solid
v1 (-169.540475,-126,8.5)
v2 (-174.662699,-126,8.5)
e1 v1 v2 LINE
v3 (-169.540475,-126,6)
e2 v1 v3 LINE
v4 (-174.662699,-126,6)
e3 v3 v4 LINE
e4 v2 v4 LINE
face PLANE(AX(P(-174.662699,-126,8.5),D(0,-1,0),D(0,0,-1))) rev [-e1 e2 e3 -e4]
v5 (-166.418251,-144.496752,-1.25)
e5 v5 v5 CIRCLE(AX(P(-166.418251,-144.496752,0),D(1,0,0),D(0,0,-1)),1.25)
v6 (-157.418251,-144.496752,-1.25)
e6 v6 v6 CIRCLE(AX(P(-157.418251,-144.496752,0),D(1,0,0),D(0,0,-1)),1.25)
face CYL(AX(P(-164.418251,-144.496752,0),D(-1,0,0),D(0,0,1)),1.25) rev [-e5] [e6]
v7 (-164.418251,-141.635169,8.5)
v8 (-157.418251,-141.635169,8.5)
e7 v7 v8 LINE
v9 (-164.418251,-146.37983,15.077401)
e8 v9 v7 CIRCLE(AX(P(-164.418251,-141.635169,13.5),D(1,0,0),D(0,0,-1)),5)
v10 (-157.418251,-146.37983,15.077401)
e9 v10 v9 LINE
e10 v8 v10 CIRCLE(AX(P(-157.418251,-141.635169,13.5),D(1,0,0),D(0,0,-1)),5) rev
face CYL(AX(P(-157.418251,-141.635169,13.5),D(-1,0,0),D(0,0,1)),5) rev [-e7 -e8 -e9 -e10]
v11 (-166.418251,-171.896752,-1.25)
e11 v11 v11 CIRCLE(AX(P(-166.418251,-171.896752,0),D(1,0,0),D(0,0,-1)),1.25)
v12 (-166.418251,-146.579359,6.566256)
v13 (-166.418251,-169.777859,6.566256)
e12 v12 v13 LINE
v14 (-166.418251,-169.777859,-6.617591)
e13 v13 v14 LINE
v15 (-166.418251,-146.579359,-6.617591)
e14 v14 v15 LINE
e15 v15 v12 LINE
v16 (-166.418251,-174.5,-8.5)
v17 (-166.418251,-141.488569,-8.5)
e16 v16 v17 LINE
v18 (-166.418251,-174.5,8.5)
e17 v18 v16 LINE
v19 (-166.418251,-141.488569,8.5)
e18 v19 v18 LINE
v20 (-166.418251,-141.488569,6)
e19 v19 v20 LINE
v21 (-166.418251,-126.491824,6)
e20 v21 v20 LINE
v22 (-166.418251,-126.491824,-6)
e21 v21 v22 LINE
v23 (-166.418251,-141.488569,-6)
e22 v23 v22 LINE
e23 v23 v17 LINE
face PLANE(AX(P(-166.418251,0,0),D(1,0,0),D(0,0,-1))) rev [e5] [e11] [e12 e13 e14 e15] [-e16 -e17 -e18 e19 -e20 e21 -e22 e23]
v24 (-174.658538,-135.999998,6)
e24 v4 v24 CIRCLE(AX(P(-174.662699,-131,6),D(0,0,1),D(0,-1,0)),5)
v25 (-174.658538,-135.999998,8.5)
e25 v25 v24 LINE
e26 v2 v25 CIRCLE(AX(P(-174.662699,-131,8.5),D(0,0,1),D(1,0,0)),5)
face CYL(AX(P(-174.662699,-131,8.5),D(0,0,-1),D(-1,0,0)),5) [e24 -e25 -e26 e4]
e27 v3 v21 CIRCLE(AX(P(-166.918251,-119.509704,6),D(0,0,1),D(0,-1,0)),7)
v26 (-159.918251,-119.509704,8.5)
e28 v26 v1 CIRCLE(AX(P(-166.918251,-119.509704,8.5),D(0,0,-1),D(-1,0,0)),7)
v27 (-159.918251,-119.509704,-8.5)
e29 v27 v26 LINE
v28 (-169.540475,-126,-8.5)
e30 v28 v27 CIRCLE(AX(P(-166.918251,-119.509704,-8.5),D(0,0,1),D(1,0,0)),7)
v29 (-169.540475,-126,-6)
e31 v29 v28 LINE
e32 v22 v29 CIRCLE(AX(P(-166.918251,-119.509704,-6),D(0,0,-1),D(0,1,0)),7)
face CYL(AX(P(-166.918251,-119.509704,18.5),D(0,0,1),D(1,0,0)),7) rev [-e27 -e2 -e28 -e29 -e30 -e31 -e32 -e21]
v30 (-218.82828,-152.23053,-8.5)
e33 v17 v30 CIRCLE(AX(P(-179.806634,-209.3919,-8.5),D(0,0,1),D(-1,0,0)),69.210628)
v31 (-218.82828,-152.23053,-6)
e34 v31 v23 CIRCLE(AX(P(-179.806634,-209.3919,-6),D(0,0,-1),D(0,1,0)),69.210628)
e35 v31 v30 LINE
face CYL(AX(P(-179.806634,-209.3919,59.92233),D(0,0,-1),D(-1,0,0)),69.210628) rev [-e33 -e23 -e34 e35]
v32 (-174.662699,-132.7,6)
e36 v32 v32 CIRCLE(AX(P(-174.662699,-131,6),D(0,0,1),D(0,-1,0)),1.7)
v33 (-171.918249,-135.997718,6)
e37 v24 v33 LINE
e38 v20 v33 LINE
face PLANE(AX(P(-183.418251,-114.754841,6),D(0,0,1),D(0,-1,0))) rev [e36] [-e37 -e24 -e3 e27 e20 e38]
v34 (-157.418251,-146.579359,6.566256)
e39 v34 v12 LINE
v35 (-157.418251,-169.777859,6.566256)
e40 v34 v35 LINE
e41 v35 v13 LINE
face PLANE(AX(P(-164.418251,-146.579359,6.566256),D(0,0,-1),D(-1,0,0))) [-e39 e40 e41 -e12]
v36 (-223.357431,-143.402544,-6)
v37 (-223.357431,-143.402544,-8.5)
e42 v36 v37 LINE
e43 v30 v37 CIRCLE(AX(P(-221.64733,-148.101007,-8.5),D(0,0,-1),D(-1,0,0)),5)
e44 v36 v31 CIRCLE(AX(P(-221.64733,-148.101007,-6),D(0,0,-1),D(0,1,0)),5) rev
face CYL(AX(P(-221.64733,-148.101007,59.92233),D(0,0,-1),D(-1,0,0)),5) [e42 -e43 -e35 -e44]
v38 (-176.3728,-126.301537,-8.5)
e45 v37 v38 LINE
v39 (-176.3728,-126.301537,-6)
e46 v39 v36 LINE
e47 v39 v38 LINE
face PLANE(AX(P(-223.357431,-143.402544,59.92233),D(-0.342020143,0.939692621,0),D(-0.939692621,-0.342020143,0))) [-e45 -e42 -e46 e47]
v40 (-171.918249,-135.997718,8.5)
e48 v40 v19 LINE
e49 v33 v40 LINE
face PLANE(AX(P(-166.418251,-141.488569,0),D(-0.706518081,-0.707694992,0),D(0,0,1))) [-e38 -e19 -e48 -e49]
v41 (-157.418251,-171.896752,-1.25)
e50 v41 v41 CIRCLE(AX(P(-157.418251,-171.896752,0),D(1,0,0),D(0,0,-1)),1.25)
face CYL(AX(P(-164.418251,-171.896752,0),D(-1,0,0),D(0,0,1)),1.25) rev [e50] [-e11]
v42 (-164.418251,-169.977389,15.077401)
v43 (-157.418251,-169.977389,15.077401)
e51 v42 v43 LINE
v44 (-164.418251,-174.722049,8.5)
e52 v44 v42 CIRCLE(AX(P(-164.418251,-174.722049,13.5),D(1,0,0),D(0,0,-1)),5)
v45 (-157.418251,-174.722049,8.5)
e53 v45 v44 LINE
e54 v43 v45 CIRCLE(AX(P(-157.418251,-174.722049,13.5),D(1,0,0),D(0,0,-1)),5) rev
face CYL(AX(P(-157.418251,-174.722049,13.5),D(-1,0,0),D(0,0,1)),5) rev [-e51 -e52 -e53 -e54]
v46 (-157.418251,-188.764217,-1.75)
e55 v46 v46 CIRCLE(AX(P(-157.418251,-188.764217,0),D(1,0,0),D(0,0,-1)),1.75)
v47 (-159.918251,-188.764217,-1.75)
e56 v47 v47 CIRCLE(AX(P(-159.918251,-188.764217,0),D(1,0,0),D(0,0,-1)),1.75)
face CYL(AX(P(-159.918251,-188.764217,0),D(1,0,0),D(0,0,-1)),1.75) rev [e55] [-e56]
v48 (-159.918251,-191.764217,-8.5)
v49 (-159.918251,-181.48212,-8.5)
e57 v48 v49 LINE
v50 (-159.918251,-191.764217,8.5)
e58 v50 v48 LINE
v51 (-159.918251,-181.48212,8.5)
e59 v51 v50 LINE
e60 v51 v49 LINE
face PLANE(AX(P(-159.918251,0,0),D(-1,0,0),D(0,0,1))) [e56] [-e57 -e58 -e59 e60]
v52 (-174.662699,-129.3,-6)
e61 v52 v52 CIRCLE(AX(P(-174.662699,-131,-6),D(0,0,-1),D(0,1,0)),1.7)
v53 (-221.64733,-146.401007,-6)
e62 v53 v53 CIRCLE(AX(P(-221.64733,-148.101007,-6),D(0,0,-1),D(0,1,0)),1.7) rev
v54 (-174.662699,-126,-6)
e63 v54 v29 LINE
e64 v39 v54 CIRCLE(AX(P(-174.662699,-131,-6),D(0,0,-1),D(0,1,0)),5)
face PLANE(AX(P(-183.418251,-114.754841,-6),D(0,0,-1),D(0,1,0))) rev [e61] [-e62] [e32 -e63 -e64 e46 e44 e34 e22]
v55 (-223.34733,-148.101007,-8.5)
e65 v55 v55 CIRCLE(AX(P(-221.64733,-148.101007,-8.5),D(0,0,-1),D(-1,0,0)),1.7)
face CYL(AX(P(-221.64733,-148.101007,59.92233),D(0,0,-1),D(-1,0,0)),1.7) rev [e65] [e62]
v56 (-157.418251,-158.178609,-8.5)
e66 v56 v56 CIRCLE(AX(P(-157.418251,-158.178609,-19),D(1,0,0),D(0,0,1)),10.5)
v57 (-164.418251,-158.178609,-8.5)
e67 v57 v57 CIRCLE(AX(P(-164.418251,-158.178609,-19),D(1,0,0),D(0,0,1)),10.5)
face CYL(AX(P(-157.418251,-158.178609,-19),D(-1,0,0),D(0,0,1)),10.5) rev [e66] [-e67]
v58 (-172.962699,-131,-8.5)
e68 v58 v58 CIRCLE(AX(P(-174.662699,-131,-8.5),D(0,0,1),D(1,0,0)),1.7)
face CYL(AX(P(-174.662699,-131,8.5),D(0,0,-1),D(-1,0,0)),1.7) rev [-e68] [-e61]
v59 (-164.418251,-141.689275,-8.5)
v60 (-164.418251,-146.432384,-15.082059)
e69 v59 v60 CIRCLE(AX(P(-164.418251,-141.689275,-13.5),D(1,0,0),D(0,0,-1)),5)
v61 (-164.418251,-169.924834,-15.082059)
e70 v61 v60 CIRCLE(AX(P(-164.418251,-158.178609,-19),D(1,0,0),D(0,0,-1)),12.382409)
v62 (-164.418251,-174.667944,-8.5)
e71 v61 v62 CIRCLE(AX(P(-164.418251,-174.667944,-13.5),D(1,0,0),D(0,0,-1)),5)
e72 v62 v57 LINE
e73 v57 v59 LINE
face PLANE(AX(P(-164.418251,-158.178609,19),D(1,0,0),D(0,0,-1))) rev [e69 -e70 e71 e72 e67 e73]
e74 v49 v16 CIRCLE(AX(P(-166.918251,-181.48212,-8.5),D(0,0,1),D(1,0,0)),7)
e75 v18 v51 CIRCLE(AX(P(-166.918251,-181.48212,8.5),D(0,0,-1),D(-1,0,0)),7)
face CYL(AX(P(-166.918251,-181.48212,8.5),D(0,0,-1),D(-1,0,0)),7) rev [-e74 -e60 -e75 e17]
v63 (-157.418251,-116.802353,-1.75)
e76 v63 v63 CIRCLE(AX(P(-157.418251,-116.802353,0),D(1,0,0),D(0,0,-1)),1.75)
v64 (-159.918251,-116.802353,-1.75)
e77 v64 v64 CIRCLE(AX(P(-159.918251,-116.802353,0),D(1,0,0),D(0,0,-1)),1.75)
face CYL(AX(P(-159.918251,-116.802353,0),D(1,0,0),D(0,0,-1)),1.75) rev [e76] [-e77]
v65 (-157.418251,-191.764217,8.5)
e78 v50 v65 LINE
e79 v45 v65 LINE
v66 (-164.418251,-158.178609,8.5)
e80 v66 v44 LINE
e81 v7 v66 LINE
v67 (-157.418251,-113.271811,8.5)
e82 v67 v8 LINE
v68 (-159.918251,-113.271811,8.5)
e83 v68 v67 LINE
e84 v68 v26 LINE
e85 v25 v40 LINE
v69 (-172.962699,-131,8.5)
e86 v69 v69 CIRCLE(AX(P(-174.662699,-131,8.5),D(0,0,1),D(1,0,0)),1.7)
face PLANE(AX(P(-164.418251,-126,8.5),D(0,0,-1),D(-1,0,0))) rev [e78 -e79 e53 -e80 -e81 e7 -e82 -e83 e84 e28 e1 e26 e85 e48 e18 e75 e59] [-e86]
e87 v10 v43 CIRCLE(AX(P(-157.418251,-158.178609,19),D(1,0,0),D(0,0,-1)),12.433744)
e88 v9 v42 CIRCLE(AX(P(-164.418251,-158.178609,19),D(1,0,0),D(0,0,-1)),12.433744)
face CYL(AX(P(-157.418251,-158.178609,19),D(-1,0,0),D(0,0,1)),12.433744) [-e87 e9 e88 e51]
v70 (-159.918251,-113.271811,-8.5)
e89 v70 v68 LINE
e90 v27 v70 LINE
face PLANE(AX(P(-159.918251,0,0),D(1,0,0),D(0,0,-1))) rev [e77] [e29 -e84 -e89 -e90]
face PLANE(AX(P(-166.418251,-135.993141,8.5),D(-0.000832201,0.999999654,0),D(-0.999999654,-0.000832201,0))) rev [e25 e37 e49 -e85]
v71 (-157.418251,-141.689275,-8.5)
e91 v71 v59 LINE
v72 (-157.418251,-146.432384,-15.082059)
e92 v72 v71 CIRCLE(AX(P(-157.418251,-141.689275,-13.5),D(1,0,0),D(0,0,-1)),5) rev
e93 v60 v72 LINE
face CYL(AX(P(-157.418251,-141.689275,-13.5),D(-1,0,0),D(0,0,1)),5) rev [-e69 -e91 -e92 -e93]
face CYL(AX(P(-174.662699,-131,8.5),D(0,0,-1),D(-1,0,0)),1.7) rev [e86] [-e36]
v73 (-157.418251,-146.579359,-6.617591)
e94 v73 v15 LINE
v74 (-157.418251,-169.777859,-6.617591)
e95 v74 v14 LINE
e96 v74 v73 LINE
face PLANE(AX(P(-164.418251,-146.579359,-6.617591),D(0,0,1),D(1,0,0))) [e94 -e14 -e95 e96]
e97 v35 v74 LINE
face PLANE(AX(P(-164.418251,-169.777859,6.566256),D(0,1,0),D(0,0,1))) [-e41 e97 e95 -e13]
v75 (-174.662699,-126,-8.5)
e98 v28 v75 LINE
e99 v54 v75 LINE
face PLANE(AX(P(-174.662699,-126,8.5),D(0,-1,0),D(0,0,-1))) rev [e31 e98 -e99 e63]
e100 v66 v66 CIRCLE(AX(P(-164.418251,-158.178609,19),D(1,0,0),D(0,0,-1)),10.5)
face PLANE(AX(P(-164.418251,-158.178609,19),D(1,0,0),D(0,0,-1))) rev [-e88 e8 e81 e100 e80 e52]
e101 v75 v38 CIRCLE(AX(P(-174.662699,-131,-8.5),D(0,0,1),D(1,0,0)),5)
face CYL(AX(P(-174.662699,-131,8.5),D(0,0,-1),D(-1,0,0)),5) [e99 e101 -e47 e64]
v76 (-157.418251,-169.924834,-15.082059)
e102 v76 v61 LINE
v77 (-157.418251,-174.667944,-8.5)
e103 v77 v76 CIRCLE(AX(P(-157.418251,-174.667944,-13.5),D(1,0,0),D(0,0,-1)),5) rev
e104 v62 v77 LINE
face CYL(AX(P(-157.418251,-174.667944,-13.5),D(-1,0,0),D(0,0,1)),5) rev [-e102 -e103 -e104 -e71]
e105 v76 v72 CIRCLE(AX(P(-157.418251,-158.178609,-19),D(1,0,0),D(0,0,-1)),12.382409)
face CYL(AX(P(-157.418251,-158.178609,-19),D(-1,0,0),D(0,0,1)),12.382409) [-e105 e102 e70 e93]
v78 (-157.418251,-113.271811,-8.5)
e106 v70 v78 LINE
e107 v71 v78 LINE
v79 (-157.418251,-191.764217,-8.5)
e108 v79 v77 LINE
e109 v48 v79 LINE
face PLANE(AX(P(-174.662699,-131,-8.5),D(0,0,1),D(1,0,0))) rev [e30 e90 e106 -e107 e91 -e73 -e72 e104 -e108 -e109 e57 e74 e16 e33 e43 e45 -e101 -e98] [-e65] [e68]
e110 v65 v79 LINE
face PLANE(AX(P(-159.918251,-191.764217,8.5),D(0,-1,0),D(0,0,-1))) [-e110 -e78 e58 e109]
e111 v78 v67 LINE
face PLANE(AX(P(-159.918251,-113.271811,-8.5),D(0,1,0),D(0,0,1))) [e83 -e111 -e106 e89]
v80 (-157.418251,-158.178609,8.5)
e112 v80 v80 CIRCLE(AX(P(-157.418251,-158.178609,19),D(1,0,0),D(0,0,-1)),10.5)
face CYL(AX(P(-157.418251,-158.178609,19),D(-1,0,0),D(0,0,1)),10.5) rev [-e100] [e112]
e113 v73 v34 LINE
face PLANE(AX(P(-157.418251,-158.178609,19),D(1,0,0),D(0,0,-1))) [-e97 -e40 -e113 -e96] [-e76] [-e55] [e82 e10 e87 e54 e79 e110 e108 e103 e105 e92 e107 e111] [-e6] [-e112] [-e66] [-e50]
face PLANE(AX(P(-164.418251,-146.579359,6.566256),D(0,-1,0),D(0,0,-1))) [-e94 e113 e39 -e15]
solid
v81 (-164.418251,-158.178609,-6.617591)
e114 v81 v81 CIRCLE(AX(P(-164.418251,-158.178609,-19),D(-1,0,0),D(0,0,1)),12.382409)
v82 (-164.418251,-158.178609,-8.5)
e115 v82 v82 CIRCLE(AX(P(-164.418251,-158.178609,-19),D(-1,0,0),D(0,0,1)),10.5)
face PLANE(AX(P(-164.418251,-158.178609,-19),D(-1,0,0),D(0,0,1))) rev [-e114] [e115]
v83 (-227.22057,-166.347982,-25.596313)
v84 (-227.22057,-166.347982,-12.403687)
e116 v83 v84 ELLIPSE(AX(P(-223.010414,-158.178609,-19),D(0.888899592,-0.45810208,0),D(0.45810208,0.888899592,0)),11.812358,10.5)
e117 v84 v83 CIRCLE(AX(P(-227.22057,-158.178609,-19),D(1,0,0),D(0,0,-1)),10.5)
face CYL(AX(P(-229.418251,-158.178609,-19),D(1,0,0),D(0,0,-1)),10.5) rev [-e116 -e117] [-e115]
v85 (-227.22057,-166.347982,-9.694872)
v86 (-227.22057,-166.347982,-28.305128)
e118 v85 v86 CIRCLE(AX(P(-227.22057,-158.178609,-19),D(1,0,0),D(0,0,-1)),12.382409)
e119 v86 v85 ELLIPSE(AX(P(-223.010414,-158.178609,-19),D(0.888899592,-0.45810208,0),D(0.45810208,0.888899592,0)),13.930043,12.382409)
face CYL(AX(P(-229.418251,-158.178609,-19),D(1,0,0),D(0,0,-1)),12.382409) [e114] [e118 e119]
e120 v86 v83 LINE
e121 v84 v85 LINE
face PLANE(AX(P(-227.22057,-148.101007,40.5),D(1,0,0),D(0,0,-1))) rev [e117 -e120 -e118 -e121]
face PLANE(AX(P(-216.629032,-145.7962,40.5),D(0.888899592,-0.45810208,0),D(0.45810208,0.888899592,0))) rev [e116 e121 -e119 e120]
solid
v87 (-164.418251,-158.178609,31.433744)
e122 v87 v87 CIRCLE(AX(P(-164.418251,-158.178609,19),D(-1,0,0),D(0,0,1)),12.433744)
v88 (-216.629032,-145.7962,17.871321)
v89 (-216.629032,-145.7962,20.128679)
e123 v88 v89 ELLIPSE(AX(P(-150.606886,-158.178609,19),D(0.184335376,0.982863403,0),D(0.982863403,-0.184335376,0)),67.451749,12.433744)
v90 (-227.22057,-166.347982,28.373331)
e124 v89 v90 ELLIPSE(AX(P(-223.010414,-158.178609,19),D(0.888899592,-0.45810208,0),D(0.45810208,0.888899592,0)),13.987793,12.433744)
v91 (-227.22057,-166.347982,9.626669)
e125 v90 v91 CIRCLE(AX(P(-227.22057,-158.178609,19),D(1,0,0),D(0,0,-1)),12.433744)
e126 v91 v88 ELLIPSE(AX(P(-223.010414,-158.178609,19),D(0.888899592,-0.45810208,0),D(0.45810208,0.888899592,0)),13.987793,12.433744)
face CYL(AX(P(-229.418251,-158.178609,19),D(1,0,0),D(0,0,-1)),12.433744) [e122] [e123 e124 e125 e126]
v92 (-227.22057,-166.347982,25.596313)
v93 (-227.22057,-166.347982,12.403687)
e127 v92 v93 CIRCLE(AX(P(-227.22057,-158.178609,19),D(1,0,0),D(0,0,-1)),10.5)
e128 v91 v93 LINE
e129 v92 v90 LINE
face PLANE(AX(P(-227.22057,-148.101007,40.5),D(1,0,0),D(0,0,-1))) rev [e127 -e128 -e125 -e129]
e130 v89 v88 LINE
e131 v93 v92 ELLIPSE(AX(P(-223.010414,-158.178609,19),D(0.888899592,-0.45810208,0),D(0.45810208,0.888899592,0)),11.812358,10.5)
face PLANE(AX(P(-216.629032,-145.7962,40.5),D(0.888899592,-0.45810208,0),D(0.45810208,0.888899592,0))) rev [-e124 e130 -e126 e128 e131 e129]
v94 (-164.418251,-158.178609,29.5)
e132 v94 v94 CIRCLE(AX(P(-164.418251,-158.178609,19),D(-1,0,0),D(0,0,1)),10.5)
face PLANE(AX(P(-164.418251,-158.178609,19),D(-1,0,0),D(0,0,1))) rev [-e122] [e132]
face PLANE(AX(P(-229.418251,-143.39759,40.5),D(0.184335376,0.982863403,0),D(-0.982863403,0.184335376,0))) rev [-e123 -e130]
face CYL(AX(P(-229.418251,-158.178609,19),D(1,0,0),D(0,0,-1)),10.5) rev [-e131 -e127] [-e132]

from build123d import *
from OCP.BRepFilletAPI import BRepFilletAPI_MakeChamfer

# Parameters (mm, degrees)
SKETCH_1_R          = 1.7
EXTRUDE_1_DEPTH     = 8.5
SKETCH_2_W          = 12
SKETCH_2_H          = 22.490317402
CUT_EXTRUDE_1_DEPTH = 17
SKETCH_3_W          = 17
SKETCH_3_H          = 48.5
SKETCH_3_R          = 1.25
SKETCH_3_W_2        = 13.183847054
SKETCH_3_H_2        = 23.198500104
EXTRUDE_2_DEPTH     = 2
CUT_EXTRUDE_2_DEPTH = 27
CHAMFER_1_SIZE      = 5.5
CHAMFER_1_SIZE2     = 5.4954286
SKETCH_5_R          = 10.5
SKETCH_5_R_2        = 1.25
SKETCH_5_W          = 13.183847054
SKETCH_5_H          = 23.198500104
EXTRUDE_3_DEPTH     = 7
SKETCH_6_R          = 12.433743537
SKETCH_6_R_2        = 10.5
EXTRUDE_4_DEPTH     = 65
SKETCH_6_R_3        = 12.382409409
EXTRUDE_4_2_DEPTH   = 65
CUT_EXTRUDE_3_DEPTH = 50
SKETCH_8_W          = 17
SKETCH_8_H          = 17.264216674
SKETCH_8_R          = 1.75
SKETCH_8_H_2        = 24.850413137
EXTRUDE_5_DEPTH     = 2.5
FILLET_START        = -8.5
FILLET_1_DEPTH      = 17
FILLET_1_2_DEPTH    = 2.5
FILLET_START_2      = 6
FILLET_1_3_DEPTH    = 2.5
FILLET_2_R          = 5
SKETCH_9_R          = 1.7
EXTRUDE_6_DEPTH     = 2.5
CUT_EXTRUDE_6_DEPTH = 49
SKETCH_13_W         = 3.687301031
SKETCH_13_H         = 25.158467393
CUT_EXTRUDE_7_DEPTH = 49


with BuildPart() as part:
    # 草图1 → 凸台-拉伸1 (new, symmetric)
    with BuildSketch(Plane.XY):
        with BuildLine():
            Line((-174.662698808, -126), (-166.418250776, -126))
            Line((-166.418250776, -126), (-166.418250776, -135.993140688))
            Line((-166.418250776, -135.993140688), (-174.658537801, -135.999998269))
            ThreePointArc((-174.658537801, -135.999998269), (-179.662698375, -131.002080504), (-174.662698808, -126))
        make_face()
        with Locations((-174.662698808, -131)):
            Circle(SKETCH_1_R, mode=Mode.SUBTRACT)
    extrude(amount=EXTRUDE_1_DEPTH, both=True)

    # 草图2 → 切除-拉伸1 (cut)
    with BuildSketch(Plane(origin=(-166.418250776, 0, 0), x_dir=(0, 0, -1), z_dir=(1, 0, 0))):
        with Locations((0, -126)):
            Rectangle(SKETCH_2_W, SKETCH_2_H)
    extrude(amount=-CUT_EXTRUDE_1_DEPTH, mode=Mode.SUBTRACT)


with BuildPart() as cut_extrude_1_piece_1:
    # of the separate pieces the step leaves, piece 1, a body of its own (cut_extrude_1_pieces)
    add(part.part.solids().sort_by_distance((-174.662698808, -126, 6))[0])



with BuildPart() as cut_extrude_1_piece_2:
    # of the separate pieces the step leaves, piece 2, a body of its own (cut_extrude_1_pieces)
    add(part.part.solids().sort_by_distance((-174.662698808, -126, -8.5))[0])


with BuildPart() as cut_extrude_1_piece_1_1:
    add(cut_extrude_1_piece_1.part)

    add(cut_extrude_1_piece_2.part)  # 凸台-拉伸2 merges 切除-拉伸1 piece 2
    # 草图3 → 凸台-拉伸2 (add)
    with BuildSketch(Plane(origin=(-166.418250776, 0, 0), x_dir=(0, 0, -1), z_dir=(1, 0, 0))):
        with Locations((0, -150.25)):
            Rectangle(SKETCH_3_W, SKETCH_3_H)
        with Locations((0, -144.496752449)):
            Circle(SKETCH_3_R, mode=Mode.SUBTRACT)
        with Locations((0, -171.896752449)):
            Circle(SKETCH_3_R, mode=Mode.SUBTRACT)
        with Locations((0.025667064, -158.178609239)):
            Rectangle(SKETCH_3_W_2, SKETCH_3_H_2, mode=Mode.SUBTRACT)
    extrude(amount=EXTRUDE_2_DEPTH)

    # 草图4 → 切除-拉伸2 (cut)
    with BuildSketch(Plane(origin=(0, 0, -8.5), x_dir=(-1, 0, 0), z_dir=(0, 0, -1))):
        Polygon((169.540474792, -126), (164.418250776, -131.122224016), (164.418250776, -126), align=None)
    extrude(amount=-CUT_EXTRUDE_2_DEPTH, mode=Mode.SUBTRACT)

    # 倒角1: one chamfer whose edges measure the first distance from different faces: ONE call of the kernel's chamfer builder (chamfer() names one face for all edges)
    chamfer_1_edges_1 = [cut_extrude_1_piece_1_1.edges().sort_by_distance(p)[0] for p in [
        (-166.418250776, -135.993140688, -7.25),
    ]]
    chamfer_1_side_1 = [cut_extrude_1_piece_1_1.faces().sort_by_distance(p)[0] for p in [
        (-170.538394288, -135.996569478, -7.25),
    ]]
    chamfer_1_edges_2 = [cut_extrude_1_piece_1_1.edges().sort_by_distance(p)[0] for p in [
        (-166.418250776, -135.993140688, 7.25),
    ]]
    chamfer_1_side_2 = [cut_extrude_1_piece_1_1.faces().sort_by_distance(p)[0] for p in [
        (-170.538394288, -135.996569478, 7.25),
    ]]
    chamfer_1 = BRepFilletAPI_MakeChamfer(cut_extrude_1_piece_1_1.part.solid().wrapped)
    for e in chamfer_1_edges_1:
        chamfer_1.Add(CHAMFER_1_SIZE, CHAMFER_1_SIZE2, e.wrapped, chamfer_1_side_1[0].wrapped)  # the first distance lies on this face
    for e in chamfer_1_edges_2:
        chamfer_1.Add(CHAMFER_1_SIZE, CHAMFER_1_SIZE2, e.wrapped, chamfer_1_side_2[0].wrapped)  # the first distance lies on this face
    add(Compound.cast(chamfer_1.Shape()), mode=Mode.REPLACE)

    # 草图5 → 凸台-拉伸3 (add)
    with BuildSketch(Plane(origin=(-164.418250776, 0, 0), x_dir=(0, 0, -1), z_dir=(1, 0, 0))):
        with BuildLine():
            Line((-8.5, -164.838037019), (-8.5, -174.5))
            Line((-8.5, -174.5), (8.5, -174.5))
            Line((8.5, -174.5), (8.5, -164.741692568))
            ThreePointArc((8.5, -164.741692568), (31.382409409, -158.178609239), (8.5, -151.61552591))
            Line((8.5, -151.61552591), (8.5, -131.122224016))
            Line((8.5, -131.122224016), (-8.5, -131.122224016))
            Line((-8.5, -131.122224016), (-8.5, -151.519181459))
            ThreePointArc((-8.5, -151.519181459), (-31.433743537, -158.178609239), (-8.5, -164.838037019))
        make_face()
        with Locations((-19, -158.178609239)):
            Circle(SKETCH_5_R, mode=Mode.SUBTRACT)
        with Locations(Location((19, -158.178609239, 0), (0, 0, 180))):
            Circle(SKETCH_5_R, mode=Mode.SUBTRACT)
        with Locations((0, -171.896752449)):
            Circle(SKETCH_5_R_2, mode=Mode.SUBTRACT)
        with Locations((0, -144.496752449)):
            Circle(SKETCH_5_R_2, mode=Mode.SUBTRACT)
        with Locations((0.025667064, -158.178609239)):
            Rectangle(SKETCH_5_W, SKETCH_5_H, mode=Mode.SUBTRACT)
    extrude(amount=EXTRUDE_3_DEPTH)

    # 草图7 → 切除-拉伸3 (cut)
    with BuildSketch(Plane(origin=(0, 0, -8.5), x_dir=(-1, 0, 0), z_dir=(0, 0, -1))):
        Polygon((164.418250776, -131.122224016), (157.418250776, -138.122224016), (157.418250776, -131.122224016), align=None)
    extrude(amount=-CUT_EXTRUDE_3_DEPTH, mode=Mode.SUBTRACT)

    # 草图8 → 凸台-拉伸5 (add)
    # profile 1 of 2: a face of its own
    with BuildSketch(Plane(origin=(-157.418250776, 0, 0), x_dir=(0, 0, -1), z_dir=(1, 0, 0))):
        with Locations((0, -183.132108337)):
            Rectangle(SKETCH_8_W, SKETCH_8_H)
        with Locations((0, -188.764216674)):
            Circle(SKETCH_8_R, mode=Mode.SUBTRACT)
    # profile 2 of 2: a face of its own
    with BuildSketch(Plane(origin=(-157.418250776, 0, 0), x_dir=(0, 0, -1), z_dir=(1, 0, 0))):
        with Locations((0, -125.697017448)):
            Rectangle(SKETCH_8_W, SKETCH_8_H_2)
        with Locations((0, -116.802352716)):
            Circle(SKETCH_8_R, mode=Mode.SUBTRACT)
    extrude(amount=-EXTRUDE_5_DEPTH)

    # 圆角1: read off the stored shape, not the designer's step
    # 圆角1 outline → 圆角1 (add)
    with BuildSketch(Plane.XY.offset(FILLET_START)):
        with BuildLine():
            Line((-159.918250776, -174.5), (-166.418250776, -174.5))
            ThreePointArc((-166.418250776, -174.5), (-161.794775393, -176.712424015), (-159.918250776, -181.482120022))
            Line((-159.918250776, -181.482120022), (-159.918250776, -174.5))
        make_face()
        with BuildLine():
            Line((-166.418250776, -126.491824096), (-166.418250776, -129.122224016))
            Line((-166.418250776, -129.122224016), (-159.918250776, -135.622224016))
            Line((-159.918250776, -135.622224016), (-159.918250776, -119.509704074))
            ThreePointArc((-159.918250776, -119.509704074), (-161.794775393, -124.279400081), (-166.418250776, -126.491824096))
        make_face()
    extrude(amount=FILLET_1_DEPTH)

    # Fillet 1 2 outline → Fillet 1 2 (add)
    with BuildSketch(Plane.XY.offset(FILLET_START)):
        with BuildLine():
            Line((-169.540474792, -126), (-166.418250776, -129.122224016))
            Line((-166.418250776, -129.122224016), (-166.418250776, -126.491824096))
            ThreePointArc((-166.418250776, -126.491824096), (-168.007485107, -126.424439685), (-169.540474792, -126))
        make_face()
    extrude(amount=FILLET_1_2_DEPTH)

    # Fillet 1 3 outline → Fillet 1 3 (add)
    with BuildSketch(Plane.XY.offset(FILLET_START_2)):
        with BuildLine():
            Line((-169.540474792, -126), (-166.418250776, -129.122224016))
            Line((-166.418250776, -129.122224016), (-166.418250776, -126.491824096))
            ThreePointArc((-166.418250776, -126.491824096), (-168.007485107, -126.424439685), (-169.540474792, -126))
        make_face()
    extrude(amount=FILLET_1_3_DEPTH)

    # 圆角2
    fillet_2_edges = [cut_extrude_1_piece_1_1.edges().sort_by_distance(p)[0] for p in [
        (-160.918250776, -164.838037019, 8.5),
        (-160.918250776, -151.519181459, 8.5),
        (-160.918250776, -151.61552591, -8.5),
        (-160.918250776, -164.741692568, -8.5),
    ]]
    fillet(fillet_2_edges, radius=FILLET_2_R)

    # 草图9 → 凸台-拉伸6 (add)
    with BuildSketch(Plane(origin=(0, 0, -8.5), x_dir=(-1, 0, 0), z_dir=(0, 0, -1))):
        with BuildLine():
            Line((223.357430564, -143.402544062), (176.372799524, -126.301536896))
            ThreePointArc((176.372799524, -126.301536896), (179.586375871, -131.870289709), (174.658537801, -135.999998269))
            Line((174.658537801, -135.999998269), (171.918248871, -135.997717796))
            Line((171.918248871, -135.997717796), (166.418250776, -141.488569288))
            ThreePointArc((166.418250776, -141.488569288), (193.703161063, -141.590737418), (218.828279725, -152.230529706))
            ThreePointArc((218.828279725, -152.230529706), (226.096012217, -150.383379873), (223.357430564, -143.402544062))
        make_face()
        with Locations((221.647329847, -148.101007166)):
            Circle(SKETCH_9_R, mode=Mode.SUBTRACT)
    extrude(amount=-EXTRUDE_6_DEPTH)


with BuildPart() as body_2:
    # 草图6 → 凸台-拉伸4 (new body)
    with BuildSketch(Plane.ZY.offset(164.418250776)):
        with Locations((19, -158.178609239)):
            Circle(SKETCH_6_R)
        with Locations((19, -158.178609239)):
            Circle(SKETCH_6_R_2, mode=Mode.SUBTRACT)
    extrude(amount=EXTRUDE_4_DEPTH)


with BuildPart() as body_3:
    # 草图6 → Extrude 4 2 (new body)
    with BuildSketch(Plane.ZY.offset(164.418250776)):
        with Locations((-19, -158.178609239)):
            Circle(SKETCH_6_R_3)
        with Locations((-19, -158.178609239)):
            Circle(SKETCH_6_R_2, mode=Mode.SUBTRACT)
    extrude(amount=EXTRUDE_4_2_DEPTH)


with BuildPart() as cut_extrude_6_tool:
    # 草图12 → 切除-拉伸6 (new, symmetric)
    with BuildSketch(Plane(origin=(0, 0, -8.5), x_dir=(-1, 0, 0), z_dir=(0, 0, -1))):
        Polygon((216.629032078, -145.79619983), (229.418250776, -170.612352776), (229.418250776, -143.397590388), align=None)
    extrude(amount=CUT_EXTRUDE_6_DEPTH, both=True)


with BuildPart() as body_3_1:
    add(body_3.part)

    # 切除-拉伸6: cut by cut_extrude_6_tool
    add(cut_extrude_6_tool.part, mode=Mode.SUBTRACT)


with BuildPart() as body_2_1:
    add(body_2.part)

    # 切除-拉伸6: cut by cut_extrude_6_tool
    add(cut_extrude_6_tool.part, mode=Mode.SUBTRACT)


with BuildPart() as cut_extrude_7_tool:
    # 草图13 → 切除-拉伸7 (new, symmetric)
    with BuildSketch(Plane(origin=(0, 0, -8.5), x_dir=(-1, 0, 0), z_dir=(0, 0, -1))):
        with Locations((229.064220935, -160.680240862)):
            Rectangle(SKETCH_13_W, SKETCH_13_H)
    extrude(amount=CUT_EXTRUDE_7_DEPTH, both=True)


with BuildPart() as body_2_2:
    add(body_2_1.part)

    # 切除-拉伸7: cut by cut_extrude_7_tool
    add(cut_extrude_7_tool.part, mode=Mode.SUBTRACT)


with BuildPart() as body_3_2:
    add(body_3_1.part)

    # 切除-拉伸7: cut by cut_extrude_7_tool
    add(cut_extrude_7_tool.part, mode=Mode.SUBTRACT)


solid = Compound([cut_extrude_1_piece_1_1.part, body_2_2.part, body_3_2.part])
